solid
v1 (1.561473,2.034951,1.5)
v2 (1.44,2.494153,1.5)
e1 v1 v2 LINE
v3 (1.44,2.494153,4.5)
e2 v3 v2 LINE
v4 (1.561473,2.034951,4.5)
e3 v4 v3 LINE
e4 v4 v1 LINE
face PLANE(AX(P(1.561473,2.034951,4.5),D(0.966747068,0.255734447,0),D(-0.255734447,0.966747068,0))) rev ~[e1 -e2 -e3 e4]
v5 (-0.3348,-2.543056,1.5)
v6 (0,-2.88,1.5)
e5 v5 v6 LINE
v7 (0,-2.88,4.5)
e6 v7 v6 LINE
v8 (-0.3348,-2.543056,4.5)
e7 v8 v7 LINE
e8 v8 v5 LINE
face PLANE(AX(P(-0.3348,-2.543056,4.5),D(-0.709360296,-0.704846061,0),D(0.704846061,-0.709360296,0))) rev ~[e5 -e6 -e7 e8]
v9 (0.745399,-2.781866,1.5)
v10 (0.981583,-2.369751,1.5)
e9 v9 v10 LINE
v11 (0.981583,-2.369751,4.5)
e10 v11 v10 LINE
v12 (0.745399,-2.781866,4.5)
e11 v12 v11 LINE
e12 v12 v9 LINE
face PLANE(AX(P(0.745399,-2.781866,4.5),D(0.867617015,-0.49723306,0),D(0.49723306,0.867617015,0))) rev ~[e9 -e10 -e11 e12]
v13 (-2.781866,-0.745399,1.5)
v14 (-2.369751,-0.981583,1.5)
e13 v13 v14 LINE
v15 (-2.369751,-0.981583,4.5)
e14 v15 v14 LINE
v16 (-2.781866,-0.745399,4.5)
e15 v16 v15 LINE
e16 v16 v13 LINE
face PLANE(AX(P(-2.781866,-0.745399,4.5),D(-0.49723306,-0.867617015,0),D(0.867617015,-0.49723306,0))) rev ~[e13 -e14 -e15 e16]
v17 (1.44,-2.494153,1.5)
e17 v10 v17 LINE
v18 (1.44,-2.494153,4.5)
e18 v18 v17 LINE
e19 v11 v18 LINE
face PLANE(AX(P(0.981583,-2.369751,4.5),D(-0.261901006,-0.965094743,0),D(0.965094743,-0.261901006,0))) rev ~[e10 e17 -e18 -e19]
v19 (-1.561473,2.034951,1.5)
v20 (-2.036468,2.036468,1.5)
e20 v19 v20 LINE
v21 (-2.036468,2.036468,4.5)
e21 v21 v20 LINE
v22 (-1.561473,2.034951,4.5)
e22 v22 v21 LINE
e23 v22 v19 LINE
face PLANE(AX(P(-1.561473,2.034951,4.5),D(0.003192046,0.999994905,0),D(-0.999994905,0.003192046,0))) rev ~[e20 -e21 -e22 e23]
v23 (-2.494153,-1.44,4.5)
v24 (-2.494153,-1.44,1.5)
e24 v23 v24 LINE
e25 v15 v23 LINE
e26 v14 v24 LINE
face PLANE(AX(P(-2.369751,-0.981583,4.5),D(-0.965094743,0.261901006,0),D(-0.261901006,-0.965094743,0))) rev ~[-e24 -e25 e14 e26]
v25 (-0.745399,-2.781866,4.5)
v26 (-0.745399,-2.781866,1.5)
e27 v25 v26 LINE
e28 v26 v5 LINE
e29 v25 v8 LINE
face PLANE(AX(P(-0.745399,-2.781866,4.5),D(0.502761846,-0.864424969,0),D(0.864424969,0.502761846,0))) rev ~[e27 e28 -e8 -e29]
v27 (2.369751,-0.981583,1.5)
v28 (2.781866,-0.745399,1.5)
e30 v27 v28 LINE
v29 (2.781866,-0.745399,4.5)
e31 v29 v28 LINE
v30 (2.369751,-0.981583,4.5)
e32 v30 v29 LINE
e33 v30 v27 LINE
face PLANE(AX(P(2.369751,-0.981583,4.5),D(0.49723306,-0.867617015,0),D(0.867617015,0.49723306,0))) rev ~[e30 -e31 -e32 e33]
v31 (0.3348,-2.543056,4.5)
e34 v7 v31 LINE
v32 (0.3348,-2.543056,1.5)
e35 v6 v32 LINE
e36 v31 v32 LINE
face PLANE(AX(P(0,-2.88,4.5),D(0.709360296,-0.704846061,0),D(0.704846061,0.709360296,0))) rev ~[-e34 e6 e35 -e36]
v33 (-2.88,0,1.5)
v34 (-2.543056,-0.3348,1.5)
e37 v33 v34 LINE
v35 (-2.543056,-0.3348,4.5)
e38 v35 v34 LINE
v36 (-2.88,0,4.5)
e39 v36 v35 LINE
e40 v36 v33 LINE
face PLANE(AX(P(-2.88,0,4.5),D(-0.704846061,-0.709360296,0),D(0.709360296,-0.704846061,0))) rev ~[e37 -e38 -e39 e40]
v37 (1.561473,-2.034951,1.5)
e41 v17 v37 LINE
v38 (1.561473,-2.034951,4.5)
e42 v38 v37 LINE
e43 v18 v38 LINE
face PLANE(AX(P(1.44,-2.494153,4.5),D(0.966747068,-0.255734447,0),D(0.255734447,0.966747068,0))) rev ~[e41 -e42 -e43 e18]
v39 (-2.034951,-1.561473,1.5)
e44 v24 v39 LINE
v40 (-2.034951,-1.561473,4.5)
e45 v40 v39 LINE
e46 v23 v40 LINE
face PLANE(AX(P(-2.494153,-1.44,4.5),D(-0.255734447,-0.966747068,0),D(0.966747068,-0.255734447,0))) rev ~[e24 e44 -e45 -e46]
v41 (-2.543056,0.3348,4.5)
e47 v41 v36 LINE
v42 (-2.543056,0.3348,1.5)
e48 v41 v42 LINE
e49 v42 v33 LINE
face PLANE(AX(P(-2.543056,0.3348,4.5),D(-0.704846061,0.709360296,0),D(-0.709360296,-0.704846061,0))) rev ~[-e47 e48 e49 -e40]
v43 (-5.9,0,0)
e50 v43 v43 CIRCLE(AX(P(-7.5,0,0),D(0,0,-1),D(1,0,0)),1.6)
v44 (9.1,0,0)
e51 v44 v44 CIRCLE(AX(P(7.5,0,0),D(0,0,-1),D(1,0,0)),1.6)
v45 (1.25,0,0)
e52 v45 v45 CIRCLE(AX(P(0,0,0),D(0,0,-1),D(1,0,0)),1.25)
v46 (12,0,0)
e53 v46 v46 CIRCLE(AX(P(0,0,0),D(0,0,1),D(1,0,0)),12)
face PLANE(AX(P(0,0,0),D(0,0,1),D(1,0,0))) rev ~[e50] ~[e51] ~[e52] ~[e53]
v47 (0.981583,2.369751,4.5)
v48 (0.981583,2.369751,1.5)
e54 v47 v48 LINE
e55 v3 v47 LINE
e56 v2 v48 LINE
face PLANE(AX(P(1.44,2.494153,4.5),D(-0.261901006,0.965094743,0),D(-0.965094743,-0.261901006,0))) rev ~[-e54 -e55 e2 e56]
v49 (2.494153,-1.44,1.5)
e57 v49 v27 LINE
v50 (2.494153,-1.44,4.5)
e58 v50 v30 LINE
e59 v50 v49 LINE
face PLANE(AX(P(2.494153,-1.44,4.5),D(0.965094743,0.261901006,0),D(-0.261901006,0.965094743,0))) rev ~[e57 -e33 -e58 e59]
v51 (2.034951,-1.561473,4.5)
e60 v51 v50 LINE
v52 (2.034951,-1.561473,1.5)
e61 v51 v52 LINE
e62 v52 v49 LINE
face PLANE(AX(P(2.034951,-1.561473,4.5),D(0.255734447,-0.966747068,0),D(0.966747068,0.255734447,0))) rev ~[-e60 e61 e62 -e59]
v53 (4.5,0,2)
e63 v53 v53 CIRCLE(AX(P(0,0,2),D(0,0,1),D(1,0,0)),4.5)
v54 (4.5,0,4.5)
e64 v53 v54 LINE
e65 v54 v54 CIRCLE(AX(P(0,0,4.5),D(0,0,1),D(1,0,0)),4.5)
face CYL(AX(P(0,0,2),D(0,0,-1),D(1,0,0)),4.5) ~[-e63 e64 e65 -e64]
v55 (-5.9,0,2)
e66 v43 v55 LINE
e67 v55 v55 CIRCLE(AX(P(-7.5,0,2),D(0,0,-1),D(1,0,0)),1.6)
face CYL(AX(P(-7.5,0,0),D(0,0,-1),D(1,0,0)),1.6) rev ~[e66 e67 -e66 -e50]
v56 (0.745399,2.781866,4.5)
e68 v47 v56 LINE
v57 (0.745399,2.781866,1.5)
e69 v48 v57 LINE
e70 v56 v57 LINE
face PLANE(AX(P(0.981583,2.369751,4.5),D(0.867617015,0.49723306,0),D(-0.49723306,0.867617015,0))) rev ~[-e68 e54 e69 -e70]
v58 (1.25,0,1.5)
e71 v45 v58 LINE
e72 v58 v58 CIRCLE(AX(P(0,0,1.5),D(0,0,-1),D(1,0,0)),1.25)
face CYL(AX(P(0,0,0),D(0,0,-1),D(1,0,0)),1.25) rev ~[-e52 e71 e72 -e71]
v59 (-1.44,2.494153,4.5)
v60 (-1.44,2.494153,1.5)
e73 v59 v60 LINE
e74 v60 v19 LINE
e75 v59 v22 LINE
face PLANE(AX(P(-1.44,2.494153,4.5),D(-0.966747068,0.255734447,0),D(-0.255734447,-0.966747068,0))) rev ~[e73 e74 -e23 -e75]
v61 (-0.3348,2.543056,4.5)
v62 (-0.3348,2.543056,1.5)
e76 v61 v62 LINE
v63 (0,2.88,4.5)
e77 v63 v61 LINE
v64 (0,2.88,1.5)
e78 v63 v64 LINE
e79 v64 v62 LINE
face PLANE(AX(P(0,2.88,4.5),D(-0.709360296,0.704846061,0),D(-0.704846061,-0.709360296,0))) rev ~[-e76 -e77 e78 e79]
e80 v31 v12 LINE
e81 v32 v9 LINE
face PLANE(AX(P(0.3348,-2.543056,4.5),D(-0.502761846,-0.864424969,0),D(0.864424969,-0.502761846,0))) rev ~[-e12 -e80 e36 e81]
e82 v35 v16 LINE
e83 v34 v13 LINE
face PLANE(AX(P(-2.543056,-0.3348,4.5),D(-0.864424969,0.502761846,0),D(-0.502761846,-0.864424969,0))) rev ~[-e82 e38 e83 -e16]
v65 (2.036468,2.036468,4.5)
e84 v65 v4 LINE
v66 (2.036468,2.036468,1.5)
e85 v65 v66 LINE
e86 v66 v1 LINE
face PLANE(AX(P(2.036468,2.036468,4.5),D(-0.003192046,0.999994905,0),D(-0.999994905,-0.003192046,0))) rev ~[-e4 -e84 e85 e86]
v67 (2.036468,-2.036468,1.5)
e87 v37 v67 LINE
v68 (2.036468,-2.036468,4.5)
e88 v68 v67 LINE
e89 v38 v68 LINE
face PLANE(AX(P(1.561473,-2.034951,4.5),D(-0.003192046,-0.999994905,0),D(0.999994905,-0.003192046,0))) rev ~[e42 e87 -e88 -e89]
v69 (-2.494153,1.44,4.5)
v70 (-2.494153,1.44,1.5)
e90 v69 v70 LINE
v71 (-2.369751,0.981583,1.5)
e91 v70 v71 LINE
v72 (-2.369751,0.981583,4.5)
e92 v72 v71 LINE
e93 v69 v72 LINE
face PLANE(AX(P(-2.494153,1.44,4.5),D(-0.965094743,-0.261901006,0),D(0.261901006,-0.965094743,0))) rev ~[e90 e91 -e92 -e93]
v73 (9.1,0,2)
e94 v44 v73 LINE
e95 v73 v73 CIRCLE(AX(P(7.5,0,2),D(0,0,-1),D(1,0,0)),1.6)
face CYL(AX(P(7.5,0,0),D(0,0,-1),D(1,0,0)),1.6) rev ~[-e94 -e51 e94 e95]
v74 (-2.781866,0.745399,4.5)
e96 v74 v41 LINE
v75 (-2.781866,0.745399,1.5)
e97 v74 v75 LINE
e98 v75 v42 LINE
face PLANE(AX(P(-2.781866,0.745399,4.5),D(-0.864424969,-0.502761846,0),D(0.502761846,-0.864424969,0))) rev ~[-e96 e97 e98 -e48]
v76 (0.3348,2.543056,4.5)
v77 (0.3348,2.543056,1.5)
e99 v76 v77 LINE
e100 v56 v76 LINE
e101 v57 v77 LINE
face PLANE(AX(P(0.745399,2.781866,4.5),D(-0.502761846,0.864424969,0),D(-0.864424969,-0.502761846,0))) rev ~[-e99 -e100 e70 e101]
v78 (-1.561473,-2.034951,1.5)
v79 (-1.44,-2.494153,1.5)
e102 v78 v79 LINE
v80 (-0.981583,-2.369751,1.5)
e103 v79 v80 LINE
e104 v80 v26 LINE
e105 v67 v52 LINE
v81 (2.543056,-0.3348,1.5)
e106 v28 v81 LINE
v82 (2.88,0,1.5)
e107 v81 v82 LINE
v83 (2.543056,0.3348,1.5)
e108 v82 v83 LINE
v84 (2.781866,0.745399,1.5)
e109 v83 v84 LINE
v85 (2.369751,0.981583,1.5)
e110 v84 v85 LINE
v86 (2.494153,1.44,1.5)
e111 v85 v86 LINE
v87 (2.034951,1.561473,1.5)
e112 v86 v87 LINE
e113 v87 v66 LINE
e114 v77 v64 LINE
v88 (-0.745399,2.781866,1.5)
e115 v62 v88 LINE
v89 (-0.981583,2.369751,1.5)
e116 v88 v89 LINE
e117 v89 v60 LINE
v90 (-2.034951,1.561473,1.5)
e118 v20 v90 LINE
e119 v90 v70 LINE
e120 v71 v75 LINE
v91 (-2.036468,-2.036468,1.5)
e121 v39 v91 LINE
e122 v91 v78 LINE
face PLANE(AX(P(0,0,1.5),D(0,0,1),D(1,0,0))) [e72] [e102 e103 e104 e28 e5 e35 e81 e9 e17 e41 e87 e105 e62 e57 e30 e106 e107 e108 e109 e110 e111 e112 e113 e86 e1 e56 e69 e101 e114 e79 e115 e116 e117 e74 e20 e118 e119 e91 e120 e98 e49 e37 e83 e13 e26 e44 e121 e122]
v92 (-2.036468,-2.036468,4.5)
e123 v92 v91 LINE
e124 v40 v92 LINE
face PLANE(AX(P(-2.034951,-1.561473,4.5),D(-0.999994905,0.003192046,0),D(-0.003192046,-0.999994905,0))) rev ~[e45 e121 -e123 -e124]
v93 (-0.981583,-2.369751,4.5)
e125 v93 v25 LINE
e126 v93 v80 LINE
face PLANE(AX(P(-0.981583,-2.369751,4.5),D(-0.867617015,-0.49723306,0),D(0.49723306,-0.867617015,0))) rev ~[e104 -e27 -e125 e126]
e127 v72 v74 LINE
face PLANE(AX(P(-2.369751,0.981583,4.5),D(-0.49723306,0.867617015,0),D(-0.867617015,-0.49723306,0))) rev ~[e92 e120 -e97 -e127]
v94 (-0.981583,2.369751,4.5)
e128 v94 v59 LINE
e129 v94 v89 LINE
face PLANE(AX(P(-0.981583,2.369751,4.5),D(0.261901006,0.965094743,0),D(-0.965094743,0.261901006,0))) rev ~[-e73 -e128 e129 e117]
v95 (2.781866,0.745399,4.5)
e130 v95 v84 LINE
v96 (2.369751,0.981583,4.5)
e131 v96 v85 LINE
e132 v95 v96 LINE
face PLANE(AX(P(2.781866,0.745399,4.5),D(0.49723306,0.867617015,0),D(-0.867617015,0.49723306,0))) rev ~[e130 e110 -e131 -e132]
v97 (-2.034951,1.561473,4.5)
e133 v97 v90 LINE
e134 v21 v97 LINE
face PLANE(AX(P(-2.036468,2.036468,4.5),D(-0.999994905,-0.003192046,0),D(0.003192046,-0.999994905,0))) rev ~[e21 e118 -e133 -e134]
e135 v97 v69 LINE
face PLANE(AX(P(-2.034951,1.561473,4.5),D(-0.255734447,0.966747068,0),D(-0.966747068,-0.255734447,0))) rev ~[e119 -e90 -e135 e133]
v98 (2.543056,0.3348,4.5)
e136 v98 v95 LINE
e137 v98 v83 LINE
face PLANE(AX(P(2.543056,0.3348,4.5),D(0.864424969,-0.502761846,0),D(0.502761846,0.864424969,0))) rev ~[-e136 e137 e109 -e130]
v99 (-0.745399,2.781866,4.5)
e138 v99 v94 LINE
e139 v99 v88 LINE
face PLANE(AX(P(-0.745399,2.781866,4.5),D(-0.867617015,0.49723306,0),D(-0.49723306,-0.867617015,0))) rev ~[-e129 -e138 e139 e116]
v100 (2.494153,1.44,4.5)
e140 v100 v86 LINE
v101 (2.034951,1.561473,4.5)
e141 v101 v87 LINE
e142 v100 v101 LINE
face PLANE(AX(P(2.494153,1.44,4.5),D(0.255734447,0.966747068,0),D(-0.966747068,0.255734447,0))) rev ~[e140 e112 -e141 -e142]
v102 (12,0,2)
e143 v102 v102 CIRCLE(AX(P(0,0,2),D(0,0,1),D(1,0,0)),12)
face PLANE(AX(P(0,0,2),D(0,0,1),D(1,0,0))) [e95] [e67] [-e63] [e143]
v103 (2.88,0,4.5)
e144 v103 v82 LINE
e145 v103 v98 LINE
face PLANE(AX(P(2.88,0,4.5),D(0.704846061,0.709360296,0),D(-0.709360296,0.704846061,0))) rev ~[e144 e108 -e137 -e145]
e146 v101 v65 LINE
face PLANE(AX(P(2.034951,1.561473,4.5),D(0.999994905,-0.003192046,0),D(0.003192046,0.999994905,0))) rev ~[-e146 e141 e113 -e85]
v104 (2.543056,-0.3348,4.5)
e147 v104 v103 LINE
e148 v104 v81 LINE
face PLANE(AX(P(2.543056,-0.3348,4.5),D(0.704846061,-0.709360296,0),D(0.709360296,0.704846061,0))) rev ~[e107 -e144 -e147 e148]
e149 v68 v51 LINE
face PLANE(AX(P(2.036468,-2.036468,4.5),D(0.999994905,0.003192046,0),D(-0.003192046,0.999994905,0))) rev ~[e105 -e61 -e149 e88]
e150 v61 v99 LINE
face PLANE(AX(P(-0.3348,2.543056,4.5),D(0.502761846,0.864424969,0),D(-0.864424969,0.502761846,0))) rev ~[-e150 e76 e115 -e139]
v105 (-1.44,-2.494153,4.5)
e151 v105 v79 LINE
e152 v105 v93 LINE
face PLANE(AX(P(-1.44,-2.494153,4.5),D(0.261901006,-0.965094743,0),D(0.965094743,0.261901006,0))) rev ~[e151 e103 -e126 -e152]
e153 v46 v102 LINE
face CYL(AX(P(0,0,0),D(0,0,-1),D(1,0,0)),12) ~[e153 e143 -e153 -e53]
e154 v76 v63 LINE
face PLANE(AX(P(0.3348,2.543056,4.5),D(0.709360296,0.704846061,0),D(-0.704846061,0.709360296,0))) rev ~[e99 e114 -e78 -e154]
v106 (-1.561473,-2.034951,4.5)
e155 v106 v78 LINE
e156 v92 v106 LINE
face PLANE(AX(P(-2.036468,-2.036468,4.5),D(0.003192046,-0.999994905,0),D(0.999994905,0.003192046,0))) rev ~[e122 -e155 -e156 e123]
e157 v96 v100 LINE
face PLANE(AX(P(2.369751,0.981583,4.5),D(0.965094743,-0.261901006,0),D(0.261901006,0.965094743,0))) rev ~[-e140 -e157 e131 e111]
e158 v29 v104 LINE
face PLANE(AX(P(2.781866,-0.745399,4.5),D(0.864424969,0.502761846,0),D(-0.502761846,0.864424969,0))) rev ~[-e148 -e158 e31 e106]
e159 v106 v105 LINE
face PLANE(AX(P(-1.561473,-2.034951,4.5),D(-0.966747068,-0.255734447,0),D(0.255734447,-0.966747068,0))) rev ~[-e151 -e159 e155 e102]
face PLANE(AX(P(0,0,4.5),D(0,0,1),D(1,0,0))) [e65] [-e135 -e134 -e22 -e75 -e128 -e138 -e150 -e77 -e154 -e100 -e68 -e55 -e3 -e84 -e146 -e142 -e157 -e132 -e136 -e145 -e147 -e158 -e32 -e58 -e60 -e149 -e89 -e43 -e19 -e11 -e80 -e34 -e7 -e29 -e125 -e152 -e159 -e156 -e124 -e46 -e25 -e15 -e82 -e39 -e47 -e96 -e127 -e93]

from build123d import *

# Parameters (mm, degrees)
F0_R            = 12
F1_DEPTH        = 2
F2_R            = 4.5
F3_DEPTH        = 2.5
F4_R            = 2.565
F5_DEPTH        = 3
F7_DEPTH        = 3
F7_COPIES_COUNT = 24
F8_R            = 1.25
F9_DEPTH        = 4.501
F10_R           = 1.6
F11_DEPTH       = 2


# Not quite as in the source:
# - a pattern or mirror of a feature is missing from the dataset's text; its kind, count and spacing are read off the source's solid


with BuildPart() as f1:
    # F0 (on Top) → F1 (new body)
    with BuildSketch(Plane.XY):
        Circle(F0_R)
    extrude(amount=F1_DEPTH)

    # F2 (on face) → F3 (join)
    with BuildSketch(Plane.XY.offset(2)):
        Circle(F2_R)
    extrude(amount=F3_DEPTH)

    # F4 (on face) → F5 (cut)
    with BuildSketch(Plane.XY.offset(4.5)):
        Circle(F4_R)
    extrude(amount=-F5_DEPTH, mode=Mode.SUBTRACT)

    # F6 (on face) → F7 (cut, through all)
    with BuildSketch(Plane.XY.offset(4.5)):
        with BuildLine():
            Line((0, 2.88), (-0.334799683, 2.5430560694))
            ThreePointArc((-0.334799683, 2.5430560694), (0, 2.565), (0.334799683, 2.5430560694))
            Line((0.334799683, 2.5430560694), (0, 2.88))
        make_face()
    f7 = extrude(amount=-F7_DEPTH, mode=Mode.SUBTRACT)

    # F7_copies: F7 ×24 about axis
    f7_copies_axis = Axis((0, 0, 0), (0, 0, 1))
    for i in range(1, F7_COPIES_COUNT):
        add(f7.rotate(f7_copies_axis, i * 360 / F7_COPIES_COUNT), mode=Mode.SUBTRACT)

    # F8 (on face) → F9 (cut, through all)
    with BuildSketch(Plane(origin=(0, 0, 0), x_dir=(1, 0, 0), z_dir=(0, 0, -1))):
        Circle(F8_R)
    extrude(amount=-F9_DEPTH, mode=Mode.SUBTRACT)

    # F10 (on face) → F11 (cut, through all)
    with BuildSketch(Plane(origin=(0, 0, 0), x_dir=(1, 0, 0), z_dir=(0, 0, -1))):
        with Locations((-7.5, 0)):
            Circle(F10_R)
        with Locations((7.5, 0)):
            Circle(F10_R)
    extrude(amount=-F11_DEPTH, mode=Mode.SUBTRACT)


solid = f1.part
